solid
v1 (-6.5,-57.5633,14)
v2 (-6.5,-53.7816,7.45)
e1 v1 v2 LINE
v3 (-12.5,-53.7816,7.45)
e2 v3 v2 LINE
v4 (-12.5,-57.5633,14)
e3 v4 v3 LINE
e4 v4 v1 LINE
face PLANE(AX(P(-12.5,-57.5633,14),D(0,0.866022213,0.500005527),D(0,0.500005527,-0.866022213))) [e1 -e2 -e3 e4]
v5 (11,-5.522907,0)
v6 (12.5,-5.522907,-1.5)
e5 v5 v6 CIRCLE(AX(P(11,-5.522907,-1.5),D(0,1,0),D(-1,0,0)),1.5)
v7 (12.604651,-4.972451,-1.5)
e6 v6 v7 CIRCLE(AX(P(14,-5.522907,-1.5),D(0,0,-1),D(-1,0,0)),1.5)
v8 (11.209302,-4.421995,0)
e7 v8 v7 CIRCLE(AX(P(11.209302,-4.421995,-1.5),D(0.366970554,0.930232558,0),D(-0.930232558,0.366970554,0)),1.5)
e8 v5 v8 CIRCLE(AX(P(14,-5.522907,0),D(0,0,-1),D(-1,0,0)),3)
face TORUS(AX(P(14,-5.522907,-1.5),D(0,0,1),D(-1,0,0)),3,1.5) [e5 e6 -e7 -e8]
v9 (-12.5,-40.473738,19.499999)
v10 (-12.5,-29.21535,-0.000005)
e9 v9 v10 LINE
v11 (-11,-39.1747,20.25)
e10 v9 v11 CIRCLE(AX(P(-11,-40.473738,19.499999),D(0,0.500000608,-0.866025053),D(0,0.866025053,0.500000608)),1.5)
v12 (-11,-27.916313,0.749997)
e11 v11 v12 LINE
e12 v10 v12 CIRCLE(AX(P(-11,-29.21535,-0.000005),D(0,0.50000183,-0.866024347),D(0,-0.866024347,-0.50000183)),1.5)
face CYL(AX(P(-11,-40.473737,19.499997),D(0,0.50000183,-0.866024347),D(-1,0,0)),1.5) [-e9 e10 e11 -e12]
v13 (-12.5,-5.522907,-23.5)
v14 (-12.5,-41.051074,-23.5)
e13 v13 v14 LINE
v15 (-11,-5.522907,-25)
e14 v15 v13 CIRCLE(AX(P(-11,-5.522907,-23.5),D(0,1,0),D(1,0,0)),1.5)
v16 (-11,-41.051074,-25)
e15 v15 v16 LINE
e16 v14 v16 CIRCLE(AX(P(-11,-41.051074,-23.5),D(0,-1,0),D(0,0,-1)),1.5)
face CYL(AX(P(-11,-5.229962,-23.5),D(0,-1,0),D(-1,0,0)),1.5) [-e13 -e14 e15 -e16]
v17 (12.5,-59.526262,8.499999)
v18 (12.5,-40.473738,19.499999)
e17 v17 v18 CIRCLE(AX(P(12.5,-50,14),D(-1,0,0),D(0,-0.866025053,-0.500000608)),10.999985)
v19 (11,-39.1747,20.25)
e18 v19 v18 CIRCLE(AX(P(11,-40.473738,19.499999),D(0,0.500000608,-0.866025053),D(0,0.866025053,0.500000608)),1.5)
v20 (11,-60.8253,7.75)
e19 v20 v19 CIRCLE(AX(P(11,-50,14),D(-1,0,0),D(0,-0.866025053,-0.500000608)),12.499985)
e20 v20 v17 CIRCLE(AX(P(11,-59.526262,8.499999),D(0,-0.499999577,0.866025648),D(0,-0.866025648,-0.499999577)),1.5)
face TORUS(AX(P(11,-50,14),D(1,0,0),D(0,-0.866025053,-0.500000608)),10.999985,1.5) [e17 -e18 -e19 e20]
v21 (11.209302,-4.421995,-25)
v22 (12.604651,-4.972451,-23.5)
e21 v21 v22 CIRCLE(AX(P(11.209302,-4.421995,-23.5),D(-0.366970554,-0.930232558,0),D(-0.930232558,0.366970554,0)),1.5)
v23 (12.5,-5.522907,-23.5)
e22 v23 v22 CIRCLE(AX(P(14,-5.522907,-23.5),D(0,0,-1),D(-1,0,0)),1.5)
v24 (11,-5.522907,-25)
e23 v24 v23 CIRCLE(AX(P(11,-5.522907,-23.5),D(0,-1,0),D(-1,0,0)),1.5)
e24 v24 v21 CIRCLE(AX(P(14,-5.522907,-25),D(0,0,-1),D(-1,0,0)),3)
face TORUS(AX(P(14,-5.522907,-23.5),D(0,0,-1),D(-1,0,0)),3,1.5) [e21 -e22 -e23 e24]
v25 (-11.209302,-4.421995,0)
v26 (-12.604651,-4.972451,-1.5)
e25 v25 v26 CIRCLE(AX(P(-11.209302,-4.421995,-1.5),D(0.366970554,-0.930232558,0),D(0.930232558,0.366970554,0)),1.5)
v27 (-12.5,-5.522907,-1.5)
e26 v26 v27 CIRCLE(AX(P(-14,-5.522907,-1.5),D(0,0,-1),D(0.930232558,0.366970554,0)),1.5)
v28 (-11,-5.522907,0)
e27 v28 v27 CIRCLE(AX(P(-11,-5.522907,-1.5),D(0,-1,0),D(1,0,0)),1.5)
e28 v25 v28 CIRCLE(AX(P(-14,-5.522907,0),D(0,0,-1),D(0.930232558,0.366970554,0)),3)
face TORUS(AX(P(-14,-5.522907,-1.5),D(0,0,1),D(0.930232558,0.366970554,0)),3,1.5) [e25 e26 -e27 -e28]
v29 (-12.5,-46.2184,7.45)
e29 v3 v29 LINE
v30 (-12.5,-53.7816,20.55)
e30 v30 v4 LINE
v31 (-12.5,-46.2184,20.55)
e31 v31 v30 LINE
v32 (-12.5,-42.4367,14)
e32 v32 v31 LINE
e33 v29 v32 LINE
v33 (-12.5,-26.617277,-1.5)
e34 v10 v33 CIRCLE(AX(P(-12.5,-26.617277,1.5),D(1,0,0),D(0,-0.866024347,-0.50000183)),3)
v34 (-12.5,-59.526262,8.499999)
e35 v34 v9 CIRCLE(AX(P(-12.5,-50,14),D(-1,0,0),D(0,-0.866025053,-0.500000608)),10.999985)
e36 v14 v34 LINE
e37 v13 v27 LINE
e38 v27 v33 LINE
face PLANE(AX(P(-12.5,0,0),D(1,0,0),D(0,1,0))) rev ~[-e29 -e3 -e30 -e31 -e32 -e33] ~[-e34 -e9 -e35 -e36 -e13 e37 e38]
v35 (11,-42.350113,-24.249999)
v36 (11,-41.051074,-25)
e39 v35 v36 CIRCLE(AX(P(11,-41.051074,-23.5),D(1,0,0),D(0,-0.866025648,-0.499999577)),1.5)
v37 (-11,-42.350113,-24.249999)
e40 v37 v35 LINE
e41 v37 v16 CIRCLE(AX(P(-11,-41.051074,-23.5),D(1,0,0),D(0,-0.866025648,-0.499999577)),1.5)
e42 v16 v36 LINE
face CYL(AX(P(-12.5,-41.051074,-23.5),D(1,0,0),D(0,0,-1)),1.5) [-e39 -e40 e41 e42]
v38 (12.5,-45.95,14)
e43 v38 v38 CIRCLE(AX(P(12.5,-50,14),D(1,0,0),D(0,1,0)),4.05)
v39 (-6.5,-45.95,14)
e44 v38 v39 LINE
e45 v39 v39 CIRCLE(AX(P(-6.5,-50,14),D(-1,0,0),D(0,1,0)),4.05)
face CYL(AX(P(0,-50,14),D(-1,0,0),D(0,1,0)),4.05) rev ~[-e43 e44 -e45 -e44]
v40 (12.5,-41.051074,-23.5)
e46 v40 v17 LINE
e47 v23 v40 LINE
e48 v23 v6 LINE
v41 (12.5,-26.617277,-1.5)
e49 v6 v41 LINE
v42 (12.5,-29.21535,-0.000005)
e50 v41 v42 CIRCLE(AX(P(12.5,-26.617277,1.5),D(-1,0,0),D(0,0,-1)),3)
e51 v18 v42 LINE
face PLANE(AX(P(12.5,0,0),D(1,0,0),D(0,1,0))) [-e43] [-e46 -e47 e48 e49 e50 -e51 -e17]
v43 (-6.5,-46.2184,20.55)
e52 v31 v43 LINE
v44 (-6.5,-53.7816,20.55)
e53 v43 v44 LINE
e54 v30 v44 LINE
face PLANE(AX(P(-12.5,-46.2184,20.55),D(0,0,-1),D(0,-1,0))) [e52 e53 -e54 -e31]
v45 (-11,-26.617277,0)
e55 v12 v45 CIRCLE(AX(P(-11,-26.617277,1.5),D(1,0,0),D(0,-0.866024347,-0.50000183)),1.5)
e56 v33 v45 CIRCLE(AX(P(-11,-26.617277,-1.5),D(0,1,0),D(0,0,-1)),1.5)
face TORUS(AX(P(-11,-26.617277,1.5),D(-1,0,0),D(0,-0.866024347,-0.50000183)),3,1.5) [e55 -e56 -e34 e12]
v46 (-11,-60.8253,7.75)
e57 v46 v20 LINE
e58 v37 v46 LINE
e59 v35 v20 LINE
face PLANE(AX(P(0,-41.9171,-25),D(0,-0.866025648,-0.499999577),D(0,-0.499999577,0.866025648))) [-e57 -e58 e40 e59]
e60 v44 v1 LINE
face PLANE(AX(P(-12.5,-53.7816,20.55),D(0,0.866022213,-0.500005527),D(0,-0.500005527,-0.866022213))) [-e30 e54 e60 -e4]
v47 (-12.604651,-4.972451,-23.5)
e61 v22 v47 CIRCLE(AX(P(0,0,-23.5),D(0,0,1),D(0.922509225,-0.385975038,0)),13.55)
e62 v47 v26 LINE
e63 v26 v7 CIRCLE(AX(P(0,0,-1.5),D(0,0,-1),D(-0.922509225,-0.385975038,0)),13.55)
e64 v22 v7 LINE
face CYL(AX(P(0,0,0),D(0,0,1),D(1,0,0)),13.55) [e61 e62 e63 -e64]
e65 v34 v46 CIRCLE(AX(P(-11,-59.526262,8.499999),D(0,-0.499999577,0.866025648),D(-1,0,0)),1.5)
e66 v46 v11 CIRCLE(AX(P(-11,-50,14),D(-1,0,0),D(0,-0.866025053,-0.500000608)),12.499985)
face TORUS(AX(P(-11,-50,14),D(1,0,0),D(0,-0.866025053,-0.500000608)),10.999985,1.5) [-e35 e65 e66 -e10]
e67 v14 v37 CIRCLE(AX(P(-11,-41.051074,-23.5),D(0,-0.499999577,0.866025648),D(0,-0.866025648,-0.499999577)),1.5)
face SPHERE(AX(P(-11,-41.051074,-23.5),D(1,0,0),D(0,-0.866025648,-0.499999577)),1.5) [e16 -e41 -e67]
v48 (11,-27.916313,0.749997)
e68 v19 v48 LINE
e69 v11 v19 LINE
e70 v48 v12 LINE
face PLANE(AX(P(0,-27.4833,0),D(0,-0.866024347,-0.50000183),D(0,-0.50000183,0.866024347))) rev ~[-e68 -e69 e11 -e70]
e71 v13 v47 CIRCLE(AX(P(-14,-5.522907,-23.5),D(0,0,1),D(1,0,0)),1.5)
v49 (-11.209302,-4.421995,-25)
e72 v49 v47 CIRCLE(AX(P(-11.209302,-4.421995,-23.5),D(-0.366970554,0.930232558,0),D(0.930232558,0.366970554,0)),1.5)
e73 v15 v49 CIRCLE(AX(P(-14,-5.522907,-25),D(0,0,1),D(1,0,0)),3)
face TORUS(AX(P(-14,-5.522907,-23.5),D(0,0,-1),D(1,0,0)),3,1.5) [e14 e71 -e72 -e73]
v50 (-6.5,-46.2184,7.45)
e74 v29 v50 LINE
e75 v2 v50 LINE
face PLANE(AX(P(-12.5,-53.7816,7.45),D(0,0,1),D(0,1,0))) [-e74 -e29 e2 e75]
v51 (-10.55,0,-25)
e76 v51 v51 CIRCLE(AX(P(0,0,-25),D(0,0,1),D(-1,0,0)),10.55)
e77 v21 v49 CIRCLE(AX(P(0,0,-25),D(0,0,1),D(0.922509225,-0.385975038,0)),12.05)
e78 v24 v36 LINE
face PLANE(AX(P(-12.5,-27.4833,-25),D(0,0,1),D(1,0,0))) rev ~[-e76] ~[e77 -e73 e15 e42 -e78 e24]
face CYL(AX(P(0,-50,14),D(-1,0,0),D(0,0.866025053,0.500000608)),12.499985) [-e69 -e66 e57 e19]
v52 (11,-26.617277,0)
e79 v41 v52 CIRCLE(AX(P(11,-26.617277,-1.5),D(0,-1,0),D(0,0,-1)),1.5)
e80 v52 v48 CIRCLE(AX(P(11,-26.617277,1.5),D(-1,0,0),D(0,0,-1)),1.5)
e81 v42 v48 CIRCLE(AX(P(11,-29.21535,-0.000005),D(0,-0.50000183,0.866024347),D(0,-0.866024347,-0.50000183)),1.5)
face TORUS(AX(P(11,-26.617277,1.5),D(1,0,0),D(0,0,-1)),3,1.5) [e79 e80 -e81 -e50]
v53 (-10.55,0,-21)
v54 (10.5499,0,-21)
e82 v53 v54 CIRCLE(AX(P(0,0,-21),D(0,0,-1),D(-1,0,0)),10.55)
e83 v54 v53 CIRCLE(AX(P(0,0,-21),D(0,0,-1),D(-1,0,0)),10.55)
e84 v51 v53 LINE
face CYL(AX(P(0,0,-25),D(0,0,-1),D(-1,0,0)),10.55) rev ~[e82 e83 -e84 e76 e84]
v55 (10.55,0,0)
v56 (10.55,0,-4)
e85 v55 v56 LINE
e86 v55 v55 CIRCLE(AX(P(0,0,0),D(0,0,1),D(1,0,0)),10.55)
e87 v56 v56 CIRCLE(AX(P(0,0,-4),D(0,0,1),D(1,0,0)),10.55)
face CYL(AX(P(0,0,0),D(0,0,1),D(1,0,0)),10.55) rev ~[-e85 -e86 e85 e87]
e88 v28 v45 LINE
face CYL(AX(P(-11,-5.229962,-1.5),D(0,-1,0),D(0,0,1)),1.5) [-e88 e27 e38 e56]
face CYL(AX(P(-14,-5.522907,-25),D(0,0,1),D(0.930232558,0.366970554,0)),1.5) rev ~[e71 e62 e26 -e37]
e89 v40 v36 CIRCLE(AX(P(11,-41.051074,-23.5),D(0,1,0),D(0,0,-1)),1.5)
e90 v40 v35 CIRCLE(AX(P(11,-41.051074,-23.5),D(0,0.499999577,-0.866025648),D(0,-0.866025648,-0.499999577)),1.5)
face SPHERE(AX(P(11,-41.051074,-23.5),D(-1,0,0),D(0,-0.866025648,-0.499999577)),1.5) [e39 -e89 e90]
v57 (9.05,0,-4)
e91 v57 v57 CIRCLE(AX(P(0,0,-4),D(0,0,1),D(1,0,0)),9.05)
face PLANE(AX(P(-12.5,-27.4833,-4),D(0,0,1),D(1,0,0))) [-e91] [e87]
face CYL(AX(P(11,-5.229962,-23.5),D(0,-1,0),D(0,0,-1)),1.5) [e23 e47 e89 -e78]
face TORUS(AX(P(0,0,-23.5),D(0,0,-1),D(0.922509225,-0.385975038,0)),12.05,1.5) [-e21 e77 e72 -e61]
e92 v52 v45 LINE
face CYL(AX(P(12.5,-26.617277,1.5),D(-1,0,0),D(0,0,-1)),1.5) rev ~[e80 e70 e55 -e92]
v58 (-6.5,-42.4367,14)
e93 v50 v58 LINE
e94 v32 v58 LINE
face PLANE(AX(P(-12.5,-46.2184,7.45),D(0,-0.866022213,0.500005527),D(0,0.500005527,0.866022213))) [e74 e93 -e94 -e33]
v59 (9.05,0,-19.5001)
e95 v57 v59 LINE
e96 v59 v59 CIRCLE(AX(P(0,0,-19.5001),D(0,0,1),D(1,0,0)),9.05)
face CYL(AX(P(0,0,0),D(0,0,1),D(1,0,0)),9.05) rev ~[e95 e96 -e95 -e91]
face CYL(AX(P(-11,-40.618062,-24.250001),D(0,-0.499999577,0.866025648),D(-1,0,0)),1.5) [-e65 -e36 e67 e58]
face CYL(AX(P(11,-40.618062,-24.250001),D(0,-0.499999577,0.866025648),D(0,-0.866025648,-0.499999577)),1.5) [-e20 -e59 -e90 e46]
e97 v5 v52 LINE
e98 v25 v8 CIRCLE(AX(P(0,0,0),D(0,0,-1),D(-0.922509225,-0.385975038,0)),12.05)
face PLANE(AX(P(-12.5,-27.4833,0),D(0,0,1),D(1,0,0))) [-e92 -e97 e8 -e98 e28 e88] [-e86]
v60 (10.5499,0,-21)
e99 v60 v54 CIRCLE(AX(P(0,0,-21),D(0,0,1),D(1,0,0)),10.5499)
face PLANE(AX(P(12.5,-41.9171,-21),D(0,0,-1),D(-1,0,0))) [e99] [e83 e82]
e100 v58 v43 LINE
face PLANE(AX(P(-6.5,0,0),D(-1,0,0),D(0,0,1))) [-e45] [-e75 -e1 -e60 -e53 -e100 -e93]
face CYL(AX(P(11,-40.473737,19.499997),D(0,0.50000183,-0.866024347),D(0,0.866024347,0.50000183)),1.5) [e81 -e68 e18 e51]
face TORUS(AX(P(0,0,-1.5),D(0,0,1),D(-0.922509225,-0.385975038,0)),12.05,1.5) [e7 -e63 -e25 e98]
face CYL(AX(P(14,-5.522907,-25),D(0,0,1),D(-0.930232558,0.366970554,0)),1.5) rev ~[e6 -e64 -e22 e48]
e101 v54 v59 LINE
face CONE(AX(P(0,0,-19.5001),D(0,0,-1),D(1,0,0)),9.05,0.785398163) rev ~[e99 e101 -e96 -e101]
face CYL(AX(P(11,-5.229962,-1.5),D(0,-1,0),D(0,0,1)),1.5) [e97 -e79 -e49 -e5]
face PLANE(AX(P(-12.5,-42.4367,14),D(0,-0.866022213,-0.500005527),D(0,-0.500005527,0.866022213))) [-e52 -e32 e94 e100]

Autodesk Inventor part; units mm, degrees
ref_plane "YZ Plane" through (0, 0, 0) normal (1, 0, 0) x (0, 1, 0)
ref_plane "XZ Plane" through (0, 0, 0) normal (0, 1, 0) x (-1, 0, 0)
ref_plane "XY Plane" through (0, 0, 0) normal (0, 0, 1) x (1, 0, 0)
sketch "Sketch1" plane through (0, 0, 0) normal (1, 0, 0) x (0, 1, 0)
  circle A0 centre (-50, 14) radius 4.05
  arc A1 (-39.1747, 20.25) -> (-60.8253, 7.75) centre (-50, 14) ccw
  line L0 (0, 0) -> (0, -25)
  line L1 (0, -25) -> (-41.9171, -25)
  line L2 (-41.9171, -25) -> (-60.8253, 7.75)
  line L3 (0, 0) -> (-27.4833, 0)
  line L4 (-27.4833, 0) -> (-39.1747, 20.25)
  dimension "d0" = 8.1
  dimension "d2" = 50
  dimension "d3" = 14
  dimension "d4" = 25
  dimension "d6" = 25
  dimension "d40" = 120
extrude "Extrusion1" add sketch "Sketch1" along normal mid plane 25
sketch "Sketch2" plane through (-12.5, -27.4833, 0) normal (0, 0, 1) x (1, 0, 0)
  circle A0 centre (12.5, 27.4833) radius 12.5
extrude "Extrusion2" add sketch "Sketch2" against normal up to surface (25 mm away)
sketch "Sketch12" plane through (-12.5, 0, 0) normal (-1, 0, 0) x (0, 0, 1)
  circle A0 centre (14, -50) radius 4.05 projected
  arc A1 (7.75, -60.8253) -> (20.25, -39.1747) centre (14, -50) ccw projected
  line L0 (14, -42.4367) -> (20.55, -46.2184)
  line L1 (20.55, -46.2184) -> (20.55, -53.7816)
  line L2 (20.55, -53.7816) -> (14, -57.5633)
  line L3 (14, -57.5633) -> (7.45, -53.7816)
  line L4 (7.45, -53.7816) -> (7.45, -46.2184)
  line L5 (7.45, -46.2184) -> (14, -42.4367)
  dimension "d56" = 13.1
extrude "Extrusion12" cut sketch "Sketch12" against normal blind 6
sketch "Sketch13" plane through (-12.5, -27.4833, 0) normal (0, 0, 1) x (1, 0, 0)
  arc A0 (25, 27.4833) -> (0, 27.4833) centre (12.5, 27.4833) ccw projected
  circle A1 centre (12.5, 27.4833) radius 9.05
  dimension "d59" = 18.1
extrude "Extrusion13" cut sketch "Sketch13" against normal through all
sketch "Sketch14" plane through (-12.5, -27.4833, 0) normal (0, 0, 1) x (1, 0, 0)
  circle A0 centre (12.5, 27.4833) radius 9.05 projected
  arc A1 (25, 27.4833) -> (0, 27.4833) centre (12.5, 27.4833) ccw projected
  circle A2 centre (12.5, 27.4833) radius 10.55
  dimension "d63" = 21.1
extrude "Extrusion14" cut sketch "Sketch14" against normal blind 4
sketch "Sketch15" plane through (12.5, -41.9171, -25) normal (0, 0, -1) x (-1, 0, 0)
  circle A0 centre (12.5, 41.9171) radius 9.05 projected
  arc A1 (25, 41.9171) -> (0, 41.9171) centre (12.5, 41.9171) ccw projected
  circle A2 centre (12.5, 41.9171) radius 10.55
  dimension "d67" = 21.1
extrude "Extrusion15" cut sketch "Sketch15" against normal blind 4
chamfer "Chamfer4" distance 1.5 angle 45 1 edges at (-9.05, 0, -21)
sketch "Sketch16" plane through (-12.5, -27.4833, 0) normal (0, 0, 1) x (1, 0, 0)
  circle A0 centre (12.5, 27.4833) radius 10.55 projected
  arc A1 (25, 27.4833) -> (0, 27.4833) centre (12.5, 27.4833) ccw projected
  circle A2 centre (12.5, 27.4833) radius 13.55
  dimension "d76" = 3
extrude "Extrusion16" add sketch "Sketch16" against normal up to surface (25 mm away)
fillet "Fillet2" radius 1.5 16 edges at (0, -41.9171, -25) (12.5, -51.3712, -8.625) (-12.5, -51.3712, -8.625) (12.5, -56.25, 24.8253) (12.5, -33.329, 10.125) (-12.5, -56.25, 24.8253) (-12.5, -33.329, 10.125) (12.5, -23.5735, -25) (-12.5, -23.5735, -25) (0, 13.55, -25) (-12.5, -5.23, -12.5) (0, 13.55, 0) (12.5, -5.23, -12.5) (-12.5, -16.3567, 0) (0, -27.4833, 0) (12.5, -16.3567, 0)
properties part number "hub top"
